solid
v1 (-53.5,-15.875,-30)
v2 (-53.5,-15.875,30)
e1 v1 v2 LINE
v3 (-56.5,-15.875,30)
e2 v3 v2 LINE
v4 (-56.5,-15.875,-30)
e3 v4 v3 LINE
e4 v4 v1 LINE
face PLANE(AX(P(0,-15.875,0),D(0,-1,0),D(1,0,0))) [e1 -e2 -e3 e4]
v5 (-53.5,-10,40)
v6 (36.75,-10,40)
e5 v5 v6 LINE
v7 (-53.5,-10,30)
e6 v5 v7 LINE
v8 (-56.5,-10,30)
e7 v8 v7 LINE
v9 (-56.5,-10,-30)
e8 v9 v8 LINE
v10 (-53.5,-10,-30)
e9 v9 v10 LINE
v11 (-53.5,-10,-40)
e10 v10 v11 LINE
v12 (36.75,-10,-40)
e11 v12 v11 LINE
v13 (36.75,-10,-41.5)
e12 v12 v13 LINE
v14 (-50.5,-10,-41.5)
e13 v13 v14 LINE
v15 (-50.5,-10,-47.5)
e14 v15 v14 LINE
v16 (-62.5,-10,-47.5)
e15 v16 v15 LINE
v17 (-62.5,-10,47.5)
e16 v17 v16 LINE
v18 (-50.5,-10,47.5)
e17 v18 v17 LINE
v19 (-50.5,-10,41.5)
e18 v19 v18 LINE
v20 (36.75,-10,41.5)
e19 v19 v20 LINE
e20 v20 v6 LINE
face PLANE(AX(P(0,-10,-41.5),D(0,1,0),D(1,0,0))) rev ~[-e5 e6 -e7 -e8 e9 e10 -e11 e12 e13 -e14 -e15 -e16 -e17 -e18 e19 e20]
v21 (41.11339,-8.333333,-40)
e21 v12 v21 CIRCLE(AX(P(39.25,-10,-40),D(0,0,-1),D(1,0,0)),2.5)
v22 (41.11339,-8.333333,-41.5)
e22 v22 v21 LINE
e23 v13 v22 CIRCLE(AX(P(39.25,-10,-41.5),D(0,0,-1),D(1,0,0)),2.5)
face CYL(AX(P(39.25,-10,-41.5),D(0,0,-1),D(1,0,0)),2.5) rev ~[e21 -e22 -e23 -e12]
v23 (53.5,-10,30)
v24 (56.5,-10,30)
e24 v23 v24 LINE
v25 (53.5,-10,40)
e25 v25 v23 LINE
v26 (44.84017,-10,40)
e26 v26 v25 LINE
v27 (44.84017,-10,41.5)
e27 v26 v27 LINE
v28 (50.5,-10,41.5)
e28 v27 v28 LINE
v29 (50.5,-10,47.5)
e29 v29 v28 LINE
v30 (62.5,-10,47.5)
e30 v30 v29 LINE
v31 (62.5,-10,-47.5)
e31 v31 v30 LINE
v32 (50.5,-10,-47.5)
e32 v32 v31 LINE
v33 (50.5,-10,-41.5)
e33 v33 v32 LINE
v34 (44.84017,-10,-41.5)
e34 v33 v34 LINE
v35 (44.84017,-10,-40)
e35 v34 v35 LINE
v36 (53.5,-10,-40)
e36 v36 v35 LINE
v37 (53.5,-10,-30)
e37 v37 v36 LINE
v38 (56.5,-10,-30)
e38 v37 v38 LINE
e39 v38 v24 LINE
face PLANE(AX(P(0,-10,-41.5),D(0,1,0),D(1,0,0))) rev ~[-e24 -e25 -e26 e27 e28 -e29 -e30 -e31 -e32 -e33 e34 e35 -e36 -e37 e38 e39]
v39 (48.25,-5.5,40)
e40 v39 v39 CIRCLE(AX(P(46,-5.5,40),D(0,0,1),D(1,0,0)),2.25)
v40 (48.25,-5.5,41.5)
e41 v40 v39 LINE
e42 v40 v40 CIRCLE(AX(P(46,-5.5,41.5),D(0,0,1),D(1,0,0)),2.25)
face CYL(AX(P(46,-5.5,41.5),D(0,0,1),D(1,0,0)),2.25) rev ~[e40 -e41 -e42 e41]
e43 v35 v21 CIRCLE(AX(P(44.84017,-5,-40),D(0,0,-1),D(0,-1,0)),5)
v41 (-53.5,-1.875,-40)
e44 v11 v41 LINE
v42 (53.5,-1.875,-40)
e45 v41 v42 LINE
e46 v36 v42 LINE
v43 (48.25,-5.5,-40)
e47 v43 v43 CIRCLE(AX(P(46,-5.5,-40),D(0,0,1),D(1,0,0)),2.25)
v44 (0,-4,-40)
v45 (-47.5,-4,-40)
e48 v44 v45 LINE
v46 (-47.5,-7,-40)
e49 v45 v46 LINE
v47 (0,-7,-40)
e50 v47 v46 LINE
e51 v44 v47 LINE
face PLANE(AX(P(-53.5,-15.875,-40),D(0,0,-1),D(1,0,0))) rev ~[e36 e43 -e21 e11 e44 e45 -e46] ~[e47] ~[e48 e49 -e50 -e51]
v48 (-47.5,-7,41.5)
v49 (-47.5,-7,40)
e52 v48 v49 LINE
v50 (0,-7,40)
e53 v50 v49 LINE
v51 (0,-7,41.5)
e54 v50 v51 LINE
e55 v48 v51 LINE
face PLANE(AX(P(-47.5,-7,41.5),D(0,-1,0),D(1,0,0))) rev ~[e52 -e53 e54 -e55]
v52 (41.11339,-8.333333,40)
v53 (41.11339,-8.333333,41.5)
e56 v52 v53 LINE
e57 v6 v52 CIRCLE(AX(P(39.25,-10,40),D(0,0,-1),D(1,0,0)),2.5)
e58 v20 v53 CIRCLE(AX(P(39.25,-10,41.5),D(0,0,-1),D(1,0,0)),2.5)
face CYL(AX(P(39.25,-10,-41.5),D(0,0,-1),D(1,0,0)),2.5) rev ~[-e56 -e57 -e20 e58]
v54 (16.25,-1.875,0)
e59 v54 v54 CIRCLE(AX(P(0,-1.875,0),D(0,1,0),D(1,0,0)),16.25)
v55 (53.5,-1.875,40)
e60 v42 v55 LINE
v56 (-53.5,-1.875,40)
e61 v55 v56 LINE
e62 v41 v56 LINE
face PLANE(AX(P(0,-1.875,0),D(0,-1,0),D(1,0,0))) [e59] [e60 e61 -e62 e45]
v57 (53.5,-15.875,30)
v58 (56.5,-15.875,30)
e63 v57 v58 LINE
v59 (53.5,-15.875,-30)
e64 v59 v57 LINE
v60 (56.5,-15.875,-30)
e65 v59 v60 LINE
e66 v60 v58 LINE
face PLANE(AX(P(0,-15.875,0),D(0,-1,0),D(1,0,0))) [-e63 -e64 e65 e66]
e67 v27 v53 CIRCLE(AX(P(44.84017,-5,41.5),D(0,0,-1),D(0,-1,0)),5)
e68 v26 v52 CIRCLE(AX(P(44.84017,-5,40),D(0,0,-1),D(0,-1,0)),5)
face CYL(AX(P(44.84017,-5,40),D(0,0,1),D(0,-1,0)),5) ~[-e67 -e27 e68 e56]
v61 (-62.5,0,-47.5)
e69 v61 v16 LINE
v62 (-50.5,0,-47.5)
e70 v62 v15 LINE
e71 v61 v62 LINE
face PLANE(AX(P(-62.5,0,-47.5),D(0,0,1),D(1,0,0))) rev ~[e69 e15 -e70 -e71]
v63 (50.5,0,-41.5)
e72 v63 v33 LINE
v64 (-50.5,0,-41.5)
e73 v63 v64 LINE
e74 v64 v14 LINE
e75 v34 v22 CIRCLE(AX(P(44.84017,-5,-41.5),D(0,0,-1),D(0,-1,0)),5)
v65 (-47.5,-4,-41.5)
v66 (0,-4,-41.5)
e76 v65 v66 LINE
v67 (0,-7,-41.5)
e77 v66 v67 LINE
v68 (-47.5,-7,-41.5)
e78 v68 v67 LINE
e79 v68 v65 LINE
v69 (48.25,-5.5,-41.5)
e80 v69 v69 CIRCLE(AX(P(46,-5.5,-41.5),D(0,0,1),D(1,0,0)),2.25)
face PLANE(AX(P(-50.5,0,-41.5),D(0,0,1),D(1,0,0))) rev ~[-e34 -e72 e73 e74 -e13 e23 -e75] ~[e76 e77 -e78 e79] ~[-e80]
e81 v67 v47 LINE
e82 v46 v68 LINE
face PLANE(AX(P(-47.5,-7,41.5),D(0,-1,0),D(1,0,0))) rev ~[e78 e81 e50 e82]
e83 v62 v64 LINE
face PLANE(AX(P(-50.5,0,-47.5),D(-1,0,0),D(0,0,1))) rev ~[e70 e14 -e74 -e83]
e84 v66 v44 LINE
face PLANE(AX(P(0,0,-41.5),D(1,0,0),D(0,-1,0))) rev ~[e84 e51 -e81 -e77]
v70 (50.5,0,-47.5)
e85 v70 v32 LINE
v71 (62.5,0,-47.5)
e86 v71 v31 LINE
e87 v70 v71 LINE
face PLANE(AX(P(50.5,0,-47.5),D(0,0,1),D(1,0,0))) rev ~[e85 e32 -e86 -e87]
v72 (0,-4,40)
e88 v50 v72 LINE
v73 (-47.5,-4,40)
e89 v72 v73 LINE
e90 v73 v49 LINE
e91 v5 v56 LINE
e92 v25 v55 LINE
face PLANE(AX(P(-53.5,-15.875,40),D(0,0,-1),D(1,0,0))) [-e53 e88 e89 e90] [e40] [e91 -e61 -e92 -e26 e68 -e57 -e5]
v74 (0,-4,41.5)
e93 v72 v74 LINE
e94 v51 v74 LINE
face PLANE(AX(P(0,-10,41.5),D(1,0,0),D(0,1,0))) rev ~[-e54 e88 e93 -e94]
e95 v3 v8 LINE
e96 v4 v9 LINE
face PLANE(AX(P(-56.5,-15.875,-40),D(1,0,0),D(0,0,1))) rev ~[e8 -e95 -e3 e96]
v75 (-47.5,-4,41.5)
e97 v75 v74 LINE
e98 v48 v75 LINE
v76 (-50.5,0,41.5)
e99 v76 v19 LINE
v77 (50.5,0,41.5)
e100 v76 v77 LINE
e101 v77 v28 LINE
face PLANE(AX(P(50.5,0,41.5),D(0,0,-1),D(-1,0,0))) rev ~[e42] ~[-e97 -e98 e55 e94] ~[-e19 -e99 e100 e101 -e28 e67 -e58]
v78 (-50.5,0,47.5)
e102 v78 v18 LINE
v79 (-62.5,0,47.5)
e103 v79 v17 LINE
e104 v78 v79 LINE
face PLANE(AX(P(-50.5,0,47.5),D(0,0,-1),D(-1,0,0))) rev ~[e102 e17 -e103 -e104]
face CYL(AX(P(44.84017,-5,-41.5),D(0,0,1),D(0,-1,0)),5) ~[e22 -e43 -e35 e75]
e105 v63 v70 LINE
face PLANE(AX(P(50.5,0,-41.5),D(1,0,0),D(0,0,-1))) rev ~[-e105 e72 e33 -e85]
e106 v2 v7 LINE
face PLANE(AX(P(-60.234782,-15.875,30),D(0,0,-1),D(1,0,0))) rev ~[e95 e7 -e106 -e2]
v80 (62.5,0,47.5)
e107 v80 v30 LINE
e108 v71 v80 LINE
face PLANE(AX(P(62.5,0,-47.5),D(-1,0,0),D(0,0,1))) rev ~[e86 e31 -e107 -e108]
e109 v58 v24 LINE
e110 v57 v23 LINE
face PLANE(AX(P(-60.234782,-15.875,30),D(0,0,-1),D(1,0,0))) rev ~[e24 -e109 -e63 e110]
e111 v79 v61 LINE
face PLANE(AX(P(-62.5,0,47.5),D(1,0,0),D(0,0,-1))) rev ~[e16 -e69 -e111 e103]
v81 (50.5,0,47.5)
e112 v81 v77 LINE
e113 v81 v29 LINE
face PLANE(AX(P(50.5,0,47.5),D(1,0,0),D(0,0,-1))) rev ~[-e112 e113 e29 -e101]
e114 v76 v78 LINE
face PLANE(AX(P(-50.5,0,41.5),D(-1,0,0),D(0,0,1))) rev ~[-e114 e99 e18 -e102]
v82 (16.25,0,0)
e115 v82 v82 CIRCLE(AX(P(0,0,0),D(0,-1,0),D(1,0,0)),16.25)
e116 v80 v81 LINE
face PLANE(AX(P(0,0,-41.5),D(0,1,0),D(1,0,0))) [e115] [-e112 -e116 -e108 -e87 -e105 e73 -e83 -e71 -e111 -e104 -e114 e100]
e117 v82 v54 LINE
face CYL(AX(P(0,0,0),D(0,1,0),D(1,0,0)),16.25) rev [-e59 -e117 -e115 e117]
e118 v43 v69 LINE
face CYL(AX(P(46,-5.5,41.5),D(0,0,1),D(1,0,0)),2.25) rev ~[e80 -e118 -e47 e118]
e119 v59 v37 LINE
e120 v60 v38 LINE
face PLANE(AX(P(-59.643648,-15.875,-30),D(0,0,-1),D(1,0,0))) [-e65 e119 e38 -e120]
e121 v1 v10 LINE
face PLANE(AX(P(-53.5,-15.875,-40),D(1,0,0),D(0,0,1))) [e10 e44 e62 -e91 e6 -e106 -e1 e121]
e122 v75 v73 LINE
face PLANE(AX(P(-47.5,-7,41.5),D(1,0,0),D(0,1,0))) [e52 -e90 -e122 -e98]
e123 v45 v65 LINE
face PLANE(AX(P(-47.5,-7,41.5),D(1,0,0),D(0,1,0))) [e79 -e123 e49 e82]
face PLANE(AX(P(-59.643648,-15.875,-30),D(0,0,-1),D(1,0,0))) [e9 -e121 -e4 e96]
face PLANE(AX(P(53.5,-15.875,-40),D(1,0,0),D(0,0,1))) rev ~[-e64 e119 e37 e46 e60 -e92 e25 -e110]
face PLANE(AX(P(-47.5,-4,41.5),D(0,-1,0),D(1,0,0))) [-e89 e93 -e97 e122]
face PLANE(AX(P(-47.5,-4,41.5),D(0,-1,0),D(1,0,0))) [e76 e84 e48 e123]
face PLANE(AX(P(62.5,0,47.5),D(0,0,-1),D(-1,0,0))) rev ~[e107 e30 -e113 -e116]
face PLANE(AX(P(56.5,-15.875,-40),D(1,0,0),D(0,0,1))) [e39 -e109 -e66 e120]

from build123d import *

# Parameters (mm, degrees)
F0_R      = 16.25
F1_DEPTH  = 15.875
F2_W      = 139.2096877098
F2_H      = 115.5483946204
F2_W_2    = 113
F2_H_2    = 80
F3_DEPTH  = 5.875
F4_W      = 107
F4_H      = 80
F5_DEPTH  = 14
F6_W      = 120.5911301091
F6_H      = 13.1527084535
F6_W_2    = 121.3300417974
F6_H_2    = 15.8128053223
F7_DEPTH  = 5.875
F8_R      = 1.5
F8_W      = 89
F8_H      = 3
F9_DEPTH  = 100
F10_W     = 42.4407012761
F10_H     = 10
F11_DEPTH = 1.5
F12_W     = 42.5221920013
F12_H     = 10
F13_DEPTH = 1.5
F14_R     = 2.5
F15_DEPTH = 95.5
F16_R     = 2.25
F17_DEPTH = 200
F18_R     = 5


with BuildPart() as f1:
    # F0 (on Front) → F1 (new body)
    with BuildSketch(Plane.XZ):
        Polygon((-50.5, 47.5), (-62.5, 47.5), (-62.5, -47.5), (-50.5, -47.5), (-50.5, -41.5), (50.5, -41.5), (50.5, -47.5), (62.5, -47.5), (62.5, 47.5), (50.5, 47.5), (50.5, 41.5), (-50.5, 41.5), align=None)
        Circle(F0_R, mode=Mode.SUBTRACT)
    extrude(amount=F1_DEPTH)

    # F2 (on face) → F3 (cut)
    with BuildSketch(Plane.XZ.offset(15.875)):
        Rectangle(F2_W, F2_H)
        Rectangle(F2_W_2, F2_H_2, mode=Mode.SUBTRACT)
    extrude(amount=-F3_DEPTH, mode=Mode.SUBTRACT)

    # F4 (on face) → F5 (cut)
    with BuildSketch(Plane.XZ.offset(15.875)):
        Rectangle(F4_W, F4_H)
    extrude(amount=-F5_DEPTH, mode=Mode.SUBTRACT)

    # F6 (on face) → F7 (cut)
    with BuildSketch(Plane.XZ.offset(15.875)):
        with Locations((0.0607829645, 36.5763542267)):
            Rectangle(F6_W, F6_H)
        with Locations((1.0213727103, -37.9064026611)):
            Rectangle(F6_W_2, F6_H_2)
    extrude(amount=-F7_DEPTH, mode=Mode.SUBTRACT)

    # F8 (on face) → F9 (cut)
    with BuildSketch(Plane.XY.offset(41.5)):
        with Locations((46, -5.5)):
            Circle(F8_R)
        with Locations((-3, -5.5)):
            Rectangle(F8_W, F8_H)
    extrude(amount=-F9_DEPTH, mode=Mode.SUBTRACT)

    # F10 (on face) → F11 (join)
    with BuildSketch(Plane.XY.offset(41.5)):
        with Locations((21.220350638, -5)):
            Rectangle(F10_W, F10_H)
    extrude(amount=-F11_DEPTH)

    # F12 (on face) → F13 (join)
    with BuildSketch(Plane(origin=(0, 0, -41.5), x_dir=(1, 0, 0), z_dir=(0, 0, -1))):
        with Locations((21.2610960007, 5)):
            Rectangle(F12_W, F12_H)
    extrude(amount=-F13_DEPTH)

    # F14 (on face) → F15 (cut)
    with BuildSketch(Plane(origin=(0, 0, -41.5), x_dir=(1, 0, 0), z_dir=(0, 0, -1))):
        with Locations((39.25, 10)):
            Circle(F14_R)
    extrude(amount=-F15_DEPTH, mode=Mode.SUBTRACT)

    # F16 (on face) → F17 (cut)
    with BuildSketch(Plane.XY.offset(41.5)):
        with Locations((46, -5.5)):
            Circle(F16_R)
    extrude(amount=-F17_DEPTH, mode=Mode.SUBTRACT)

    # F18
    f18_edges = [f1.edges().sort_by_distance(p)[0] for p in [
        (41.75, -10, -40.75),
        (41.75, -10, 40.75),
    ]]
    fillet(f18_edges, radius=F18_R)


solid = f1.part
